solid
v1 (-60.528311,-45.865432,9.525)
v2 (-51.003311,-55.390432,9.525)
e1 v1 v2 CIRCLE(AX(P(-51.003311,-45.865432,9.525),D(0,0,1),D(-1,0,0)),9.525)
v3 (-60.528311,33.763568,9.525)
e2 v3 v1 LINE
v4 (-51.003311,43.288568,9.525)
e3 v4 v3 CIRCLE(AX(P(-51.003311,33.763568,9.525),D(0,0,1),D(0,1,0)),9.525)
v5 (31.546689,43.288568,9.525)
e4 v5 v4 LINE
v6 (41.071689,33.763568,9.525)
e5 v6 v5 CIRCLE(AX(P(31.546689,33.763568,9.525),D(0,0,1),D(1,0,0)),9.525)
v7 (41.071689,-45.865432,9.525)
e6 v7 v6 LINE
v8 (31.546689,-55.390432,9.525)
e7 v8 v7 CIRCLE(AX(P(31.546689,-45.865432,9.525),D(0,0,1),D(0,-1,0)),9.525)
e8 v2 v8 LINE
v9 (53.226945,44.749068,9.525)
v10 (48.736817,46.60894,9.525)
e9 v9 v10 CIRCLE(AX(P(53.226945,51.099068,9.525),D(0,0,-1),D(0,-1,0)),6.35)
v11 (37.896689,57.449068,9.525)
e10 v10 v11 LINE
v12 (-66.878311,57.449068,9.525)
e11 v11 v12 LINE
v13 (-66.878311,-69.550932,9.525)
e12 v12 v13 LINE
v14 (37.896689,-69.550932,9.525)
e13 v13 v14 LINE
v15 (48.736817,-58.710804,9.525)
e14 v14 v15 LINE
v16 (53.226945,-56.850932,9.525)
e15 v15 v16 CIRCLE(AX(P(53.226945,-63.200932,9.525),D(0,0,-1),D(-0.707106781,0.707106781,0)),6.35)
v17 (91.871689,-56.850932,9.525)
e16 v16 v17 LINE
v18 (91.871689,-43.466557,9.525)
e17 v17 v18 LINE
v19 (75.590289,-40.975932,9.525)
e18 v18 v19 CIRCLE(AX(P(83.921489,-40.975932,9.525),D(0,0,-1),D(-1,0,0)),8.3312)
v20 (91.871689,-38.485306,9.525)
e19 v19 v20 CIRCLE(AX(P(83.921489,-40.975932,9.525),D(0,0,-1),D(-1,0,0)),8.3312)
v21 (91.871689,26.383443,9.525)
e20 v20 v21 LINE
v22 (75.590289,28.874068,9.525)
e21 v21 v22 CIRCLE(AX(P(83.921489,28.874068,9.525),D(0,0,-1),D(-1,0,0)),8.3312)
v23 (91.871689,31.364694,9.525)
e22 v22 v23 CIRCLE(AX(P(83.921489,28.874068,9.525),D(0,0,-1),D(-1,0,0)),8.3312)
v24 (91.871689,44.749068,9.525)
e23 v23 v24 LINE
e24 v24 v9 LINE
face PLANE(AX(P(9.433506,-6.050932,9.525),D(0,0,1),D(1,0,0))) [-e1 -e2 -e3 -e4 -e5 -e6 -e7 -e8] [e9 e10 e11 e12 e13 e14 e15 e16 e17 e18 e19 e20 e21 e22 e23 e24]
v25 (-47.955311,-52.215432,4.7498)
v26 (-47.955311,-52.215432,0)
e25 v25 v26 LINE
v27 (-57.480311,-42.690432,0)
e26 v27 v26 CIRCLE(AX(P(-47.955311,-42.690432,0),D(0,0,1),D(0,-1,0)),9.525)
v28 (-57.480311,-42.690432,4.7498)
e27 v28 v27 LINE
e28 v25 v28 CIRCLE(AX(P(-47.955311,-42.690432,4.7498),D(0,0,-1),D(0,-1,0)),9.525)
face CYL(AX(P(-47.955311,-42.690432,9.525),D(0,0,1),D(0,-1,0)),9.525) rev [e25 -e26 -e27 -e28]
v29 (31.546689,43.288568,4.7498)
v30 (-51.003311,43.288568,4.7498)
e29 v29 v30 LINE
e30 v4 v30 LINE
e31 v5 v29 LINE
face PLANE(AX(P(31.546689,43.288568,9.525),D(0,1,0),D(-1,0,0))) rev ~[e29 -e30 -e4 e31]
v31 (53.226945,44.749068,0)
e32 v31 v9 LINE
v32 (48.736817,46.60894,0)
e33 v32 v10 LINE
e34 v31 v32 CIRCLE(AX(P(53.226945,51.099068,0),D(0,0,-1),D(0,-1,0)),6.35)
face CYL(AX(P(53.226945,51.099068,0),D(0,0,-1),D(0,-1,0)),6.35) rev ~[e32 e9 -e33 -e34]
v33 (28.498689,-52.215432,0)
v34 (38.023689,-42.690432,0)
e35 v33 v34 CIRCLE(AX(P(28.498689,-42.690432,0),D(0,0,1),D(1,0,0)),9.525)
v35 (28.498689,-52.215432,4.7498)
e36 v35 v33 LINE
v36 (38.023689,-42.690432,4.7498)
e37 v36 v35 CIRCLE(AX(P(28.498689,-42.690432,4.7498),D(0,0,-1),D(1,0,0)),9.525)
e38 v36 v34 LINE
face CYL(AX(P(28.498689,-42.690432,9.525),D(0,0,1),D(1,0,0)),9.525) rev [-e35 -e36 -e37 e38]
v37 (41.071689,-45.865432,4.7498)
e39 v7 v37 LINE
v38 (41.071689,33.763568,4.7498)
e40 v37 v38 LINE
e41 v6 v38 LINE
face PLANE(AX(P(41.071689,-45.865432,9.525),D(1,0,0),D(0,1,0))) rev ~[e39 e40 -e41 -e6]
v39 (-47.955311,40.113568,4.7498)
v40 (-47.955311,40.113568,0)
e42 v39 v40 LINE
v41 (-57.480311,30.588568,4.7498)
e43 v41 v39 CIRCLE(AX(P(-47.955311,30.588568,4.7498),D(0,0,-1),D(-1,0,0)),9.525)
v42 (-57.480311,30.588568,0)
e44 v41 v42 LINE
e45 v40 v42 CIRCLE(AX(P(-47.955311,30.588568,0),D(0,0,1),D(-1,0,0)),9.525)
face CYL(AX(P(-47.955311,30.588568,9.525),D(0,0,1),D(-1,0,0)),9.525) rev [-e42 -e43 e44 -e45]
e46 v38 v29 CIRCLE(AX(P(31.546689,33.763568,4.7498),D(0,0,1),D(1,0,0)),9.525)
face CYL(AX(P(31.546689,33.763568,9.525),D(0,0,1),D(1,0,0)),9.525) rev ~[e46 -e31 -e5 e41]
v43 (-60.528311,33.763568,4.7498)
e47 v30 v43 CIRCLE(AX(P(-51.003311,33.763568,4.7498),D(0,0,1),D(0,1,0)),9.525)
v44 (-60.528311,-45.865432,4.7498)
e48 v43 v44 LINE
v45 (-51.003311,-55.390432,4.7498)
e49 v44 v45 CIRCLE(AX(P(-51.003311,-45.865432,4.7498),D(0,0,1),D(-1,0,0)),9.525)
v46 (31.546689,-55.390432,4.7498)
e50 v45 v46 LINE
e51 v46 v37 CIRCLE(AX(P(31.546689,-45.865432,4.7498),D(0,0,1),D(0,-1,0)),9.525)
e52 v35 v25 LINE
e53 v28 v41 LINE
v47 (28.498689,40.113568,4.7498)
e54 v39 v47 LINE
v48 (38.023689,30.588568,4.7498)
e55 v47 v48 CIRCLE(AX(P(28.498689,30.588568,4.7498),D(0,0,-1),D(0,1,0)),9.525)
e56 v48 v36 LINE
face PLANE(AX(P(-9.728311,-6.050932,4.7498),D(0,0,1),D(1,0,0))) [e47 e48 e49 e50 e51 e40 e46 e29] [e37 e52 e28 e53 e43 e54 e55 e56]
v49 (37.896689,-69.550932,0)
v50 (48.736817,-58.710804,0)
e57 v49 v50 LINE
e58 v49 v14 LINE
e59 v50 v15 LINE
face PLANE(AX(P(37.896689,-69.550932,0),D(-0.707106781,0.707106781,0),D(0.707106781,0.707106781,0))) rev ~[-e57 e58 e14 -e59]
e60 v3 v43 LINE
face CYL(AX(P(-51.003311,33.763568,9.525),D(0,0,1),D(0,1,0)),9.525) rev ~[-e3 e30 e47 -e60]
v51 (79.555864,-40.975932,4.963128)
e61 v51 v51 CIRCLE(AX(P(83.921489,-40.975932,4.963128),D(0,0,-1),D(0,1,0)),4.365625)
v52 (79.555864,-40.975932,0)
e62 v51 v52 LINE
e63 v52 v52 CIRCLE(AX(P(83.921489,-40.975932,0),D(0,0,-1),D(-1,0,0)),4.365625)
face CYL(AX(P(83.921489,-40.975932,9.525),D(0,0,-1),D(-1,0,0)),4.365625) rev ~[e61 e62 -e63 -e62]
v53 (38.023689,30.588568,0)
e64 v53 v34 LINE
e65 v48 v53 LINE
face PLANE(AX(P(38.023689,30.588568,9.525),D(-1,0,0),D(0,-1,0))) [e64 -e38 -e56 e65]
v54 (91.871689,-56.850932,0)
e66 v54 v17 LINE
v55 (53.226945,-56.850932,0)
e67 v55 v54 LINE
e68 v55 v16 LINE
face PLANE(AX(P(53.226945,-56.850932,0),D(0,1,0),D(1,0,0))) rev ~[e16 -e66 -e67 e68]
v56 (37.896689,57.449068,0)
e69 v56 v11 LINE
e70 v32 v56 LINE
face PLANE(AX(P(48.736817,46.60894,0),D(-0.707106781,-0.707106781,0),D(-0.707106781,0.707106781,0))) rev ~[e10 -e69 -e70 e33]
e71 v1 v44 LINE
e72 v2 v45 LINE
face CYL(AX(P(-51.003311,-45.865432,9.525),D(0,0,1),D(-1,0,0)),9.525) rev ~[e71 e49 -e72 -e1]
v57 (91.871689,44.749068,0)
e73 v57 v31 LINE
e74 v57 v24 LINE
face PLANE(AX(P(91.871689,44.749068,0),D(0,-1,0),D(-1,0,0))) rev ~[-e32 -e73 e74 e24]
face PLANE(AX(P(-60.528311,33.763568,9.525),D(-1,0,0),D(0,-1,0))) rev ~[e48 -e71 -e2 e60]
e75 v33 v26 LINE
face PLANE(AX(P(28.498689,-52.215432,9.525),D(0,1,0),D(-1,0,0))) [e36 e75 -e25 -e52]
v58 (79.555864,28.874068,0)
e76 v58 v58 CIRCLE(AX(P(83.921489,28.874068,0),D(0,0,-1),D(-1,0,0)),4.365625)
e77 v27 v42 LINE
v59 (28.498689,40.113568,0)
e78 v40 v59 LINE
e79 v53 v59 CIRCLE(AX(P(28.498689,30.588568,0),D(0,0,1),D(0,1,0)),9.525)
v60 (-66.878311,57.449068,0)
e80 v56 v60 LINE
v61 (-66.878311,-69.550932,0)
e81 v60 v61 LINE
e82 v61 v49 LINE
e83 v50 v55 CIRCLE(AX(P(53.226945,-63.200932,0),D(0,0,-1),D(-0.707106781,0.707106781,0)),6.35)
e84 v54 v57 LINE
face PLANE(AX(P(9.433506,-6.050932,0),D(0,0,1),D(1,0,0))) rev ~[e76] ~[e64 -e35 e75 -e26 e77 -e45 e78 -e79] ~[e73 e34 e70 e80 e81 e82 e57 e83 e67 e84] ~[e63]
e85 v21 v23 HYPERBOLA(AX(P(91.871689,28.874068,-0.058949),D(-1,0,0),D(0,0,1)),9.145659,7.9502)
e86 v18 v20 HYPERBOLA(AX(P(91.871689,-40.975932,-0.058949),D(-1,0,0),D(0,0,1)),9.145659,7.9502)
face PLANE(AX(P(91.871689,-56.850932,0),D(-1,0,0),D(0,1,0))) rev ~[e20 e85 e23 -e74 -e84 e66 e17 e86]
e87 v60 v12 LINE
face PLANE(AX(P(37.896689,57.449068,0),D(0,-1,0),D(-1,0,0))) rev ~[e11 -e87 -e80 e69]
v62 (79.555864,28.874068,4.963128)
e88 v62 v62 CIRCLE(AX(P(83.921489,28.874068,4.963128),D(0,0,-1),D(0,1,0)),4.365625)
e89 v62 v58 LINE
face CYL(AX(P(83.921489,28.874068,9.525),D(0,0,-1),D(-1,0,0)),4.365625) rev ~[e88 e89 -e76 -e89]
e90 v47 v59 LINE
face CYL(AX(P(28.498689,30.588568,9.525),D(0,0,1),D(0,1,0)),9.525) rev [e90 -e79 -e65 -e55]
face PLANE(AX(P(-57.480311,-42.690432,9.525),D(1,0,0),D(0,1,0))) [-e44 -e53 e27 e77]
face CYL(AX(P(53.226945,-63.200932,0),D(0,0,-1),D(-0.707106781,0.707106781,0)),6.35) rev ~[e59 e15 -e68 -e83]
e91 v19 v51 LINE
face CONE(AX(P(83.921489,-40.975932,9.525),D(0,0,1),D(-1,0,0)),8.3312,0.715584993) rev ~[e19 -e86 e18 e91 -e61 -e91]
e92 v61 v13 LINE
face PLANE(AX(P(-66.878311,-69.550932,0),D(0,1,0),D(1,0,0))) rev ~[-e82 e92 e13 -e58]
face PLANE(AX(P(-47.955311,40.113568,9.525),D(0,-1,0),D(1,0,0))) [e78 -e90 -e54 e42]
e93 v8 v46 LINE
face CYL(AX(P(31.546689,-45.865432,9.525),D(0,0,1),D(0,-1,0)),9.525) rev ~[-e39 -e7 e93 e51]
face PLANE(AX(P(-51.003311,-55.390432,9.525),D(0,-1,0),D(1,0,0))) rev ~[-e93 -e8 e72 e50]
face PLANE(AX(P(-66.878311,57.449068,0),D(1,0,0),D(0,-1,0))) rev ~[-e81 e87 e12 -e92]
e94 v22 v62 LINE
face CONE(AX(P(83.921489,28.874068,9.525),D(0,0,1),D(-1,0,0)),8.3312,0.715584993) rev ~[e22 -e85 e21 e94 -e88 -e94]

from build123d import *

# Parameters (mm, degrees)
F1_DEPTH       = 9.525
F3_DEPTH       = 4.7752
F4_DEPTH       = 9.526
F6_D           = 8.73125
F6_CSINK_D     = 16.6624
F6_CSINK_ANGLE = 82


# Not quite as in the source:
# - a length typed as a fraction of an inch, garbled in the dataset ("3 / 203.2 mm" for 3/8 in), is restored


with BuildPart() as f1:
    # F0 (on Top) → F1 (new body)
    with BuildSketch(Plane.XY):
        with BuildLine():
            Line((37.8966893194, 57.4490684102), (-66.8783106806, 57.4490684102))
            Line((-66.8783106806, 57.4490684102), (-66.8783106806, -69.5509315898))
            Line((-66.8783106806, -69.5509315898), (37.8966893194, -69.5509315898))
            Line((37.8966893194, -69.5509315898), (48.7368173799, -58.7108035293))
            ThreePointArc((48.7368173799, -58.7108035293), (50.796905645, -57.3342965584), (53.2269454405, -56.8509315898))
            Line((53.2269454405, -56.8509315898), (91.8716893194, -56.8509315898))
            Line((91.8716893194, -56.8509315898), (91.8716893194, 44.7490684102))
            Line((91.8716893194, 44.7490684102), (53.2269454405, 44.7490684102))
            ThreePointArc((53.2269454405, 44.7490684102), (50.796905645, 45.2324333787), (48.7368173799, 46.6089403496))
            Line((48.7368173799, 46.6089403496), (37.8966893194, 57.4490684102))
        make_face()
    extrude(amount=F1_DEPTH)

    # F2 (on face) → F3 (cut)
    with BuildSketch(Plane.XY.offset(9.525)):
        with BuildLine():
            Line((31.5466893194, 43.2885684102), (-51.0033106806, 43.2885684102))
            ThreePointArc((-51.0033106806, 43.2885684102), (-57.7385027714, 40.498760501), (-60.5283106806, 33.7635684102))
            Line((-60.5283106806, 33.7635684102), (-60.5283106806, -45.8654315898))
            ThreePointArc((-60.5283106806, -45.8654315898), (-57.7385027714, -52.6006236806), (-51.0033106806, -55.3904315898))
            Line((-51.0033106806, -55.3904315898), (31.5466893194, -55.3904315898))
            ThreePointArc((31.5466893194, -55.3904315898), (38.2818814102, -52.6006236806), (41.0716893194, -45.8654315898))
            Line((41.0716893194, -45.8654315898), (41.0716893194, 33.7635684102))
            ThreePointArc((41.0716893194, 33.7635684102), (38.2818814102, 40.498760501), (31.5466893194, 43.2885684102))
        make_face()
        with BuildLine():
            ThreePointArc((-57.4803106806, 30.5885684102), (-54.6905027714, 37.323760501), (-47.9553106806, 40.1135684102))
            Line((-47.9553106806, 40.1135684102), (28.4986893194, 40.1135684102))
            ThreePointArc((28.4986893194, 40.1135684102), (35.2338814102, 37.323760501), (38.0236893194, 30.5885684102))
            Line((38.0236893194, 30.5885684102), (38.0236893194, -42.6904315898))
            ThreePointArc((38.0236893194, -42.6904315898), (35.2338814102, -49.4256236806), (28.4986893194, -52.2154315898))
            Line((28.4986893194, -52.2154315898), (-47.9553106806, -52.2154315898))
            ThreePointArc((-47.9553106806, -52.2154315898), (-54.6905027714, -49.4256236806), (-57.4803106806, -42.6904315898))
            Line((-57.4803106806, -42.6904315898), (-57.4803106806, 30.5885684102))
        make_face(mode=Mode.SUBTRACT)
    extrude(amount=-F3_DEPTH, mode=Mode.SUBTRACT)

    # F4 (cut, through all): a face of the model
    f4_faces = [f1.faces().sort_by_distance(p)[0] for p in [
        (-9.7283106806, -6.0509315898, 9.525),
    ]]
    extrude(f4_faces, amount=-F4_DEPTH, mode=Mode.SUBTRACT)

    # F6 (through all)
    with Locations(Plane.XY.offset(9.525)):
        with Locations((83.9214893194, 28.8740684102), (83.9214893194, -40.9759315898)):
            CounterSinkHole(F6_D / 2, F6_CSINK_D / 2, counter_sink_angle=F6_CSINK_ANGLE)


solid = f1.part
